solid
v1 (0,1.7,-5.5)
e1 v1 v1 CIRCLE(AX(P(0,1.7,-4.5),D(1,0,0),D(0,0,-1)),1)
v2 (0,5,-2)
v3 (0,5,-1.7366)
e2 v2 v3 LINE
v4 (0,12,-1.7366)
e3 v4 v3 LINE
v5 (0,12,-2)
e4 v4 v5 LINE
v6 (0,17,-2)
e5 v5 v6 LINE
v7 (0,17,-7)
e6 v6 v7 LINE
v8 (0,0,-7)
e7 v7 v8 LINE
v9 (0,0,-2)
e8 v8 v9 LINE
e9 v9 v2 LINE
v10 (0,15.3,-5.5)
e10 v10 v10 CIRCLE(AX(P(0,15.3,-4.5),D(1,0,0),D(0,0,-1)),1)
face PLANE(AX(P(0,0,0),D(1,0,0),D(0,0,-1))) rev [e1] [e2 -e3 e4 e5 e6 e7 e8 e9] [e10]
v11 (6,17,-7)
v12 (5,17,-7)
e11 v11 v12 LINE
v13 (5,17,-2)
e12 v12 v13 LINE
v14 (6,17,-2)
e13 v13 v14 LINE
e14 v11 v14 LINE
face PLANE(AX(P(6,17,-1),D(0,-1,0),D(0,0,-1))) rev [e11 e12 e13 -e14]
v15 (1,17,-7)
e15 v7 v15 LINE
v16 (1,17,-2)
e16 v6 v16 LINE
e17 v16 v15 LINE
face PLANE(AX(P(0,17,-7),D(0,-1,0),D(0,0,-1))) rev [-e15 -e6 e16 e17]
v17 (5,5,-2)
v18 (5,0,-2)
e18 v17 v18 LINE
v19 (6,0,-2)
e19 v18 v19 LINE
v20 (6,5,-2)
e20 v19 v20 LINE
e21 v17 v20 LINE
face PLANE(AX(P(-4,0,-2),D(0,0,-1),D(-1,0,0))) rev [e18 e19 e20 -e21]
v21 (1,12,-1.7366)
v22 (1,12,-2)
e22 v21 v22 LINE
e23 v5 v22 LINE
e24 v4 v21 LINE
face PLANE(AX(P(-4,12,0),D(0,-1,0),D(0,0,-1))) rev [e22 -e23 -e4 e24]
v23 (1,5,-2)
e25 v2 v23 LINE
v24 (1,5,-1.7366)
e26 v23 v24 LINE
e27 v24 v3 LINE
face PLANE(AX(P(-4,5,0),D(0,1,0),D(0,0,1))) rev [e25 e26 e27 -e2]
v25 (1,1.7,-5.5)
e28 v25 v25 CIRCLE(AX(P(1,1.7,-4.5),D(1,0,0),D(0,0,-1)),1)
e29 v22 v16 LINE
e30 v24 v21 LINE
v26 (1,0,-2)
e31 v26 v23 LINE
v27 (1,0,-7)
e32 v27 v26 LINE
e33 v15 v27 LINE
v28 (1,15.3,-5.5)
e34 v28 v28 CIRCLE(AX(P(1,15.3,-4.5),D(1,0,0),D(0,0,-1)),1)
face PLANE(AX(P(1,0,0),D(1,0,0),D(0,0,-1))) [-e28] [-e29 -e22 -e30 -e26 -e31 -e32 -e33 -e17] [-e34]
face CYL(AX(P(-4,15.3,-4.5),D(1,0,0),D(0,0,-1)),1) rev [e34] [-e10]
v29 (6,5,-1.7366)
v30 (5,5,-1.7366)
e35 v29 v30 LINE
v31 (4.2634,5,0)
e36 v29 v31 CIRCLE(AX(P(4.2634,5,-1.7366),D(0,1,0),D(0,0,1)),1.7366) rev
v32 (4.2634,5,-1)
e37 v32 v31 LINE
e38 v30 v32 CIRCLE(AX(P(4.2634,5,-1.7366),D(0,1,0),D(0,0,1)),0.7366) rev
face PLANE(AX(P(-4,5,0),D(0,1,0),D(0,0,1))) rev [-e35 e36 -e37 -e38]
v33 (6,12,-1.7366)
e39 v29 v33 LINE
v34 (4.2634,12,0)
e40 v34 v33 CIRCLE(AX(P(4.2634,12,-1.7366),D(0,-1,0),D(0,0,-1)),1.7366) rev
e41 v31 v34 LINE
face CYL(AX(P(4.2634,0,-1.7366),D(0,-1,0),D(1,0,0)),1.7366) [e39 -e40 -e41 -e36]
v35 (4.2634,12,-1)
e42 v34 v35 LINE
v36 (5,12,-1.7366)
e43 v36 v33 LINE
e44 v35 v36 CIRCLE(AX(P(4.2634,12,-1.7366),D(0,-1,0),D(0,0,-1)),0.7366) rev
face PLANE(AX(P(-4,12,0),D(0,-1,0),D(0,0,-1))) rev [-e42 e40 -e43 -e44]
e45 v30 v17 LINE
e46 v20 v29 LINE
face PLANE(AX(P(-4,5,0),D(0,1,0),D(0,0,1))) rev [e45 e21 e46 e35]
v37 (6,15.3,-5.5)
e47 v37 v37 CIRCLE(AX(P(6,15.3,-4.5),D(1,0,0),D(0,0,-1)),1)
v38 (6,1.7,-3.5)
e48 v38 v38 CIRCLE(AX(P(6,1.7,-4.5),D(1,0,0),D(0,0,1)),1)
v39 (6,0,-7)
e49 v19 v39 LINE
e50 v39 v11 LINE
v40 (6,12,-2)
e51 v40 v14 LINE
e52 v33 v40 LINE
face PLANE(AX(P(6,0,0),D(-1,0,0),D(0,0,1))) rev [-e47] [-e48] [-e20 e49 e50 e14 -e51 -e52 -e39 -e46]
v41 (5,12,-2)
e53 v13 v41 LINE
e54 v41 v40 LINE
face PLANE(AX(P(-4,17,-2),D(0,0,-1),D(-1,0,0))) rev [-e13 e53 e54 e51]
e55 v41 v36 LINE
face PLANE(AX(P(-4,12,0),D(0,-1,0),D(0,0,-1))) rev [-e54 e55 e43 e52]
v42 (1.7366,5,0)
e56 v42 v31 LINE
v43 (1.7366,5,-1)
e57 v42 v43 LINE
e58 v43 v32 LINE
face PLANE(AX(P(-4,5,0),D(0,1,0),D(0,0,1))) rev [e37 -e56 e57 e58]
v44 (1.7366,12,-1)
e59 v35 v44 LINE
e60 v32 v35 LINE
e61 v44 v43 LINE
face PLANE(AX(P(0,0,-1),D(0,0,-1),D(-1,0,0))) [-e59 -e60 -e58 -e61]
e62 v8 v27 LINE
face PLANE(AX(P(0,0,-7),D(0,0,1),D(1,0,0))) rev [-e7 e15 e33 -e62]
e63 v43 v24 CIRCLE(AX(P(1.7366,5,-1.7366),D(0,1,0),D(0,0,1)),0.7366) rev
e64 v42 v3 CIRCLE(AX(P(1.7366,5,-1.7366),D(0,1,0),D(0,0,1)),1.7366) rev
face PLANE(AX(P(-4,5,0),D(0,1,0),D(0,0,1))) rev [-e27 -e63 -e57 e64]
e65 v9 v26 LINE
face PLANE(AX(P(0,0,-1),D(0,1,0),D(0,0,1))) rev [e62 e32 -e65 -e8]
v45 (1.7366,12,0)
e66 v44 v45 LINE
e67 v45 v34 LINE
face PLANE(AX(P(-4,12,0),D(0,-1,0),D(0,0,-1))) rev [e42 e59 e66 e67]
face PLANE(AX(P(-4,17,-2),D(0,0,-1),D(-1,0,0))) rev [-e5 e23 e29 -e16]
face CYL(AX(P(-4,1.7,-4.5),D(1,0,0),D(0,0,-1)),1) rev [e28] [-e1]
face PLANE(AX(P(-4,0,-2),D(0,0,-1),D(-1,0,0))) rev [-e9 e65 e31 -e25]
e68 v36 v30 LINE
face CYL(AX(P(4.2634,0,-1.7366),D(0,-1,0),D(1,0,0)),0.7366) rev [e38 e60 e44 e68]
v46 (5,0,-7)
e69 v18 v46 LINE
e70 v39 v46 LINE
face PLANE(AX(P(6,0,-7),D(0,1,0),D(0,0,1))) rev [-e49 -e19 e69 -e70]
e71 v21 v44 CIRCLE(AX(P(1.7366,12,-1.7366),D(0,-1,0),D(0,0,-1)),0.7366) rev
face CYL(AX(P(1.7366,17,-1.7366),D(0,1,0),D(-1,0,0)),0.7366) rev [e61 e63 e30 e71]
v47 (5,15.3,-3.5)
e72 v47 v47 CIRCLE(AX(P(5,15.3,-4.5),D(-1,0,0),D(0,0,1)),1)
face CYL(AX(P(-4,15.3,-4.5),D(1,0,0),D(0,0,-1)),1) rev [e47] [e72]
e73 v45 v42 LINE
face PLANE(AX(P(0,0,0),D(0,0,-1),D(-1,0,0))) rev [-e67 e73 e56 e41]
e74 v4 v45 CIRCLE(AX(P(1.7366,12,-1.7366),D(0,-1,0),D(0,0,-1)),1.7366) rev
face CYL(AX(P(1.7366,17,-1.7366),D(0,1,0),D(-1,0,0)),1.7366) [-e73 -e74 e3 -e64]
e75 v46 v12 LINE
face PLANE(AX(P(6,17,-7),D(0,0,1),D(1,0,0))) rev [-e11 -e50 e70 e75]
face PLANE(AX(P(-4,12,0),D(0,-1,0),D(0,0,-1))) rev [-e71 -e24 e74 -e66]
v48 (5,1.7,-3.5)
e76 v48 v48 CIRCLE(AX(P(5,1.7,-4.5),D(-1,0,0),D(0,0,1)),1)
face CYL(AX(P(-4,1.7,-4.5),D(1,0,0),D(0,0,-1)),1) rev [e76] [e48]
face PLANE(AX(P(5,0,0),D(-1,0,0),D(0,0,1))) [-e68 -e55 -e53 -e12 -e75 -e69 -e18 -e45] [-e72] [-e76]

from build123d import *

# Parameters (mm, degrees)
CROQUIS1_W                         = 6
CROQUIS1_H                         = 17
BRIDA_BASE1_DEPTH                  = 1
BRIDA_DE_ARISTA1_STRIP_W           = 5.4732
BRIDA_DE_ARISTA1_STRIP_H           = 1
BRIDA_DE_ARISTA1_STRIP_CUT_DEPTH   = 17
BRIDA_DE_ARISTA1_STRIP_2_W         = 5.4732
BRIDA_DE_ARISTA1_STRIP_2_H         = 1
BRIDA_DE_ARISTA1_STRIP_CUT_2_DEPTH = 17
BRIDA_DE_ARISTA1_DEPTH             = 17
BRIDA_DE_ARISTA1_BEND_DEPTH        = 17
CROQUIS12_W                        = 2
CROQUIS12_H                        = 5
CORTAR_EXTRUIR1_DEPTH              = 10
CROQUIS13_R                        = 1
CORTAR_EXTRUIR2_DEPTH              = 10


# Sheet-metal steps are written as plain solids
with BuildPart() as part:
    # Croquis1 → Brida base1 (new body)
    with BuildSketch(Plane.XY):
        with Locations((3, 8.5)):
            Rectangle(CROQUIS1_W, CROQUIS1_H)
    extrude(amount=-BRIDA_BASE1_DEPTH)

    # Brida de arista1 strip (across the edge) → Brida de arista1 strip cut (cut)
    with BuildSketch(Plane(origin=(6, 17, -1), x_dir=(-1, 0, 0), z_dir=(0, -1, 0))):
        with Locations((-1, -0.5)):
            Rectangle(BRIDA_DE_ARISTA1_STRIP_W, BRIDA_DE_ARISTA1_STRIP_H)
    extrude(amount=BRIDA_DE_ARISTA1_STRIP_CUT_DEPTH, mode=Mode.SUBTRACT)

    # Brida de arista1 strip 2 (across the edge) → Brida de arista1 strip cut 2 (cut)
    with BuildSketch(Plane(origin=(0, 0, -1), x_dir=(1, 0, 0), z_dir=(0, 1, 0))):
        with Locations((-1, -0.5)):
            Rectangle(BRIDA_DE_ARISTA1_STRIP_2_W, BRIDA_DE_ARISTA1_STRIP_2_H)
    extrude(amount=BRIDA_DE_ARISTA1_STRIP_CUT_2_DEPTH, mode=Mode.SUBTRACT)

    # Brida de arista1 section (across the edge) → Brida de arista1 (add)
    with BuildSketch(Plane(origin=(6, 17, -1), x_dir=(-1, 0, 0), z_dir=(0, -1, 0))):
        with BuildLine():
            Line((0, 0.7366), (0, 6))
            Line((0, 6), (1, 6))
            Line((1, 6), (1, 0.7366))
            ThreePointArc((1, 0.7366), (1.215745145, 0.215745145), (1.7366, 0))
            Line((1.7366, 0), (1.7366, -1))
            ThreePointArc((1.7366, -1), (0.508638364, -0.491361636), (0, 0.7366))
        make_face()
    extrude(amount=BRIDA_DE_ARISTA1_DEPTH)

    # Brida de arista1 section 2 (across the edge) → Brida de arista1 bend (add)
    with BuildSketch(Plane(origin=(0, 0, -1), x_dir=(1, 0, 0), z_dir=(0, 1, 0))):
        with BuildLine():
            Line((0, 0.7366), (0, 6))
            Line((0, 6), (1, 6))
            Line((1, 6), (1, 0.7366))
            ThreePointArc((1, 0.7366), (1.215745145, 0.215745145), (1.7366, 0))
            Line((1.7366, 0), (1.7366, -1))
            ThreePointArc((1.7366, -1), (0.508638364, -0.491361636), (0, 0.7366))
        make_face()
    extrude(amount=BRIDA_DE_ARISTA1_BEND_DEPTH)

    # Croquis12 → Cortar-Extruir1 (cut)
    with BuildSketch(Plane(origin=(6, 0, 0), x_dir=(0, 0, -1), z_dir=(1, 0, 0))):
        with Locations((1, 14.5)):
            Rectangle(CROQUIS12_W, CROQUIS12_H)
        with Locations((1, 2.5)):
            Rectangle(CROQUIS12_W, CROQUIS12_H)
    extrude(amount=-CORTAR_EXTRUIR1_DEPTH, mode=Mode.SUBTRACT)

    # Croquis13 → Cortar-Extruir2 (cut)
    with BuildSketch(Plane(origin=(6, 0, 0), x_dir=(0, 0, -1), z_dir=(1, 0, 0))):
        with Locations((4.5, 15.3)):
            Circle(CROQUIS13_R)
        with Locations((4.5, 1.7)):
            Circle(CROQUIS13_R)
    extrude(amount=-CORTAR_EXTRUIR2_DEPTH, mode=Mode.SUBTRACT)


solid = part.part
